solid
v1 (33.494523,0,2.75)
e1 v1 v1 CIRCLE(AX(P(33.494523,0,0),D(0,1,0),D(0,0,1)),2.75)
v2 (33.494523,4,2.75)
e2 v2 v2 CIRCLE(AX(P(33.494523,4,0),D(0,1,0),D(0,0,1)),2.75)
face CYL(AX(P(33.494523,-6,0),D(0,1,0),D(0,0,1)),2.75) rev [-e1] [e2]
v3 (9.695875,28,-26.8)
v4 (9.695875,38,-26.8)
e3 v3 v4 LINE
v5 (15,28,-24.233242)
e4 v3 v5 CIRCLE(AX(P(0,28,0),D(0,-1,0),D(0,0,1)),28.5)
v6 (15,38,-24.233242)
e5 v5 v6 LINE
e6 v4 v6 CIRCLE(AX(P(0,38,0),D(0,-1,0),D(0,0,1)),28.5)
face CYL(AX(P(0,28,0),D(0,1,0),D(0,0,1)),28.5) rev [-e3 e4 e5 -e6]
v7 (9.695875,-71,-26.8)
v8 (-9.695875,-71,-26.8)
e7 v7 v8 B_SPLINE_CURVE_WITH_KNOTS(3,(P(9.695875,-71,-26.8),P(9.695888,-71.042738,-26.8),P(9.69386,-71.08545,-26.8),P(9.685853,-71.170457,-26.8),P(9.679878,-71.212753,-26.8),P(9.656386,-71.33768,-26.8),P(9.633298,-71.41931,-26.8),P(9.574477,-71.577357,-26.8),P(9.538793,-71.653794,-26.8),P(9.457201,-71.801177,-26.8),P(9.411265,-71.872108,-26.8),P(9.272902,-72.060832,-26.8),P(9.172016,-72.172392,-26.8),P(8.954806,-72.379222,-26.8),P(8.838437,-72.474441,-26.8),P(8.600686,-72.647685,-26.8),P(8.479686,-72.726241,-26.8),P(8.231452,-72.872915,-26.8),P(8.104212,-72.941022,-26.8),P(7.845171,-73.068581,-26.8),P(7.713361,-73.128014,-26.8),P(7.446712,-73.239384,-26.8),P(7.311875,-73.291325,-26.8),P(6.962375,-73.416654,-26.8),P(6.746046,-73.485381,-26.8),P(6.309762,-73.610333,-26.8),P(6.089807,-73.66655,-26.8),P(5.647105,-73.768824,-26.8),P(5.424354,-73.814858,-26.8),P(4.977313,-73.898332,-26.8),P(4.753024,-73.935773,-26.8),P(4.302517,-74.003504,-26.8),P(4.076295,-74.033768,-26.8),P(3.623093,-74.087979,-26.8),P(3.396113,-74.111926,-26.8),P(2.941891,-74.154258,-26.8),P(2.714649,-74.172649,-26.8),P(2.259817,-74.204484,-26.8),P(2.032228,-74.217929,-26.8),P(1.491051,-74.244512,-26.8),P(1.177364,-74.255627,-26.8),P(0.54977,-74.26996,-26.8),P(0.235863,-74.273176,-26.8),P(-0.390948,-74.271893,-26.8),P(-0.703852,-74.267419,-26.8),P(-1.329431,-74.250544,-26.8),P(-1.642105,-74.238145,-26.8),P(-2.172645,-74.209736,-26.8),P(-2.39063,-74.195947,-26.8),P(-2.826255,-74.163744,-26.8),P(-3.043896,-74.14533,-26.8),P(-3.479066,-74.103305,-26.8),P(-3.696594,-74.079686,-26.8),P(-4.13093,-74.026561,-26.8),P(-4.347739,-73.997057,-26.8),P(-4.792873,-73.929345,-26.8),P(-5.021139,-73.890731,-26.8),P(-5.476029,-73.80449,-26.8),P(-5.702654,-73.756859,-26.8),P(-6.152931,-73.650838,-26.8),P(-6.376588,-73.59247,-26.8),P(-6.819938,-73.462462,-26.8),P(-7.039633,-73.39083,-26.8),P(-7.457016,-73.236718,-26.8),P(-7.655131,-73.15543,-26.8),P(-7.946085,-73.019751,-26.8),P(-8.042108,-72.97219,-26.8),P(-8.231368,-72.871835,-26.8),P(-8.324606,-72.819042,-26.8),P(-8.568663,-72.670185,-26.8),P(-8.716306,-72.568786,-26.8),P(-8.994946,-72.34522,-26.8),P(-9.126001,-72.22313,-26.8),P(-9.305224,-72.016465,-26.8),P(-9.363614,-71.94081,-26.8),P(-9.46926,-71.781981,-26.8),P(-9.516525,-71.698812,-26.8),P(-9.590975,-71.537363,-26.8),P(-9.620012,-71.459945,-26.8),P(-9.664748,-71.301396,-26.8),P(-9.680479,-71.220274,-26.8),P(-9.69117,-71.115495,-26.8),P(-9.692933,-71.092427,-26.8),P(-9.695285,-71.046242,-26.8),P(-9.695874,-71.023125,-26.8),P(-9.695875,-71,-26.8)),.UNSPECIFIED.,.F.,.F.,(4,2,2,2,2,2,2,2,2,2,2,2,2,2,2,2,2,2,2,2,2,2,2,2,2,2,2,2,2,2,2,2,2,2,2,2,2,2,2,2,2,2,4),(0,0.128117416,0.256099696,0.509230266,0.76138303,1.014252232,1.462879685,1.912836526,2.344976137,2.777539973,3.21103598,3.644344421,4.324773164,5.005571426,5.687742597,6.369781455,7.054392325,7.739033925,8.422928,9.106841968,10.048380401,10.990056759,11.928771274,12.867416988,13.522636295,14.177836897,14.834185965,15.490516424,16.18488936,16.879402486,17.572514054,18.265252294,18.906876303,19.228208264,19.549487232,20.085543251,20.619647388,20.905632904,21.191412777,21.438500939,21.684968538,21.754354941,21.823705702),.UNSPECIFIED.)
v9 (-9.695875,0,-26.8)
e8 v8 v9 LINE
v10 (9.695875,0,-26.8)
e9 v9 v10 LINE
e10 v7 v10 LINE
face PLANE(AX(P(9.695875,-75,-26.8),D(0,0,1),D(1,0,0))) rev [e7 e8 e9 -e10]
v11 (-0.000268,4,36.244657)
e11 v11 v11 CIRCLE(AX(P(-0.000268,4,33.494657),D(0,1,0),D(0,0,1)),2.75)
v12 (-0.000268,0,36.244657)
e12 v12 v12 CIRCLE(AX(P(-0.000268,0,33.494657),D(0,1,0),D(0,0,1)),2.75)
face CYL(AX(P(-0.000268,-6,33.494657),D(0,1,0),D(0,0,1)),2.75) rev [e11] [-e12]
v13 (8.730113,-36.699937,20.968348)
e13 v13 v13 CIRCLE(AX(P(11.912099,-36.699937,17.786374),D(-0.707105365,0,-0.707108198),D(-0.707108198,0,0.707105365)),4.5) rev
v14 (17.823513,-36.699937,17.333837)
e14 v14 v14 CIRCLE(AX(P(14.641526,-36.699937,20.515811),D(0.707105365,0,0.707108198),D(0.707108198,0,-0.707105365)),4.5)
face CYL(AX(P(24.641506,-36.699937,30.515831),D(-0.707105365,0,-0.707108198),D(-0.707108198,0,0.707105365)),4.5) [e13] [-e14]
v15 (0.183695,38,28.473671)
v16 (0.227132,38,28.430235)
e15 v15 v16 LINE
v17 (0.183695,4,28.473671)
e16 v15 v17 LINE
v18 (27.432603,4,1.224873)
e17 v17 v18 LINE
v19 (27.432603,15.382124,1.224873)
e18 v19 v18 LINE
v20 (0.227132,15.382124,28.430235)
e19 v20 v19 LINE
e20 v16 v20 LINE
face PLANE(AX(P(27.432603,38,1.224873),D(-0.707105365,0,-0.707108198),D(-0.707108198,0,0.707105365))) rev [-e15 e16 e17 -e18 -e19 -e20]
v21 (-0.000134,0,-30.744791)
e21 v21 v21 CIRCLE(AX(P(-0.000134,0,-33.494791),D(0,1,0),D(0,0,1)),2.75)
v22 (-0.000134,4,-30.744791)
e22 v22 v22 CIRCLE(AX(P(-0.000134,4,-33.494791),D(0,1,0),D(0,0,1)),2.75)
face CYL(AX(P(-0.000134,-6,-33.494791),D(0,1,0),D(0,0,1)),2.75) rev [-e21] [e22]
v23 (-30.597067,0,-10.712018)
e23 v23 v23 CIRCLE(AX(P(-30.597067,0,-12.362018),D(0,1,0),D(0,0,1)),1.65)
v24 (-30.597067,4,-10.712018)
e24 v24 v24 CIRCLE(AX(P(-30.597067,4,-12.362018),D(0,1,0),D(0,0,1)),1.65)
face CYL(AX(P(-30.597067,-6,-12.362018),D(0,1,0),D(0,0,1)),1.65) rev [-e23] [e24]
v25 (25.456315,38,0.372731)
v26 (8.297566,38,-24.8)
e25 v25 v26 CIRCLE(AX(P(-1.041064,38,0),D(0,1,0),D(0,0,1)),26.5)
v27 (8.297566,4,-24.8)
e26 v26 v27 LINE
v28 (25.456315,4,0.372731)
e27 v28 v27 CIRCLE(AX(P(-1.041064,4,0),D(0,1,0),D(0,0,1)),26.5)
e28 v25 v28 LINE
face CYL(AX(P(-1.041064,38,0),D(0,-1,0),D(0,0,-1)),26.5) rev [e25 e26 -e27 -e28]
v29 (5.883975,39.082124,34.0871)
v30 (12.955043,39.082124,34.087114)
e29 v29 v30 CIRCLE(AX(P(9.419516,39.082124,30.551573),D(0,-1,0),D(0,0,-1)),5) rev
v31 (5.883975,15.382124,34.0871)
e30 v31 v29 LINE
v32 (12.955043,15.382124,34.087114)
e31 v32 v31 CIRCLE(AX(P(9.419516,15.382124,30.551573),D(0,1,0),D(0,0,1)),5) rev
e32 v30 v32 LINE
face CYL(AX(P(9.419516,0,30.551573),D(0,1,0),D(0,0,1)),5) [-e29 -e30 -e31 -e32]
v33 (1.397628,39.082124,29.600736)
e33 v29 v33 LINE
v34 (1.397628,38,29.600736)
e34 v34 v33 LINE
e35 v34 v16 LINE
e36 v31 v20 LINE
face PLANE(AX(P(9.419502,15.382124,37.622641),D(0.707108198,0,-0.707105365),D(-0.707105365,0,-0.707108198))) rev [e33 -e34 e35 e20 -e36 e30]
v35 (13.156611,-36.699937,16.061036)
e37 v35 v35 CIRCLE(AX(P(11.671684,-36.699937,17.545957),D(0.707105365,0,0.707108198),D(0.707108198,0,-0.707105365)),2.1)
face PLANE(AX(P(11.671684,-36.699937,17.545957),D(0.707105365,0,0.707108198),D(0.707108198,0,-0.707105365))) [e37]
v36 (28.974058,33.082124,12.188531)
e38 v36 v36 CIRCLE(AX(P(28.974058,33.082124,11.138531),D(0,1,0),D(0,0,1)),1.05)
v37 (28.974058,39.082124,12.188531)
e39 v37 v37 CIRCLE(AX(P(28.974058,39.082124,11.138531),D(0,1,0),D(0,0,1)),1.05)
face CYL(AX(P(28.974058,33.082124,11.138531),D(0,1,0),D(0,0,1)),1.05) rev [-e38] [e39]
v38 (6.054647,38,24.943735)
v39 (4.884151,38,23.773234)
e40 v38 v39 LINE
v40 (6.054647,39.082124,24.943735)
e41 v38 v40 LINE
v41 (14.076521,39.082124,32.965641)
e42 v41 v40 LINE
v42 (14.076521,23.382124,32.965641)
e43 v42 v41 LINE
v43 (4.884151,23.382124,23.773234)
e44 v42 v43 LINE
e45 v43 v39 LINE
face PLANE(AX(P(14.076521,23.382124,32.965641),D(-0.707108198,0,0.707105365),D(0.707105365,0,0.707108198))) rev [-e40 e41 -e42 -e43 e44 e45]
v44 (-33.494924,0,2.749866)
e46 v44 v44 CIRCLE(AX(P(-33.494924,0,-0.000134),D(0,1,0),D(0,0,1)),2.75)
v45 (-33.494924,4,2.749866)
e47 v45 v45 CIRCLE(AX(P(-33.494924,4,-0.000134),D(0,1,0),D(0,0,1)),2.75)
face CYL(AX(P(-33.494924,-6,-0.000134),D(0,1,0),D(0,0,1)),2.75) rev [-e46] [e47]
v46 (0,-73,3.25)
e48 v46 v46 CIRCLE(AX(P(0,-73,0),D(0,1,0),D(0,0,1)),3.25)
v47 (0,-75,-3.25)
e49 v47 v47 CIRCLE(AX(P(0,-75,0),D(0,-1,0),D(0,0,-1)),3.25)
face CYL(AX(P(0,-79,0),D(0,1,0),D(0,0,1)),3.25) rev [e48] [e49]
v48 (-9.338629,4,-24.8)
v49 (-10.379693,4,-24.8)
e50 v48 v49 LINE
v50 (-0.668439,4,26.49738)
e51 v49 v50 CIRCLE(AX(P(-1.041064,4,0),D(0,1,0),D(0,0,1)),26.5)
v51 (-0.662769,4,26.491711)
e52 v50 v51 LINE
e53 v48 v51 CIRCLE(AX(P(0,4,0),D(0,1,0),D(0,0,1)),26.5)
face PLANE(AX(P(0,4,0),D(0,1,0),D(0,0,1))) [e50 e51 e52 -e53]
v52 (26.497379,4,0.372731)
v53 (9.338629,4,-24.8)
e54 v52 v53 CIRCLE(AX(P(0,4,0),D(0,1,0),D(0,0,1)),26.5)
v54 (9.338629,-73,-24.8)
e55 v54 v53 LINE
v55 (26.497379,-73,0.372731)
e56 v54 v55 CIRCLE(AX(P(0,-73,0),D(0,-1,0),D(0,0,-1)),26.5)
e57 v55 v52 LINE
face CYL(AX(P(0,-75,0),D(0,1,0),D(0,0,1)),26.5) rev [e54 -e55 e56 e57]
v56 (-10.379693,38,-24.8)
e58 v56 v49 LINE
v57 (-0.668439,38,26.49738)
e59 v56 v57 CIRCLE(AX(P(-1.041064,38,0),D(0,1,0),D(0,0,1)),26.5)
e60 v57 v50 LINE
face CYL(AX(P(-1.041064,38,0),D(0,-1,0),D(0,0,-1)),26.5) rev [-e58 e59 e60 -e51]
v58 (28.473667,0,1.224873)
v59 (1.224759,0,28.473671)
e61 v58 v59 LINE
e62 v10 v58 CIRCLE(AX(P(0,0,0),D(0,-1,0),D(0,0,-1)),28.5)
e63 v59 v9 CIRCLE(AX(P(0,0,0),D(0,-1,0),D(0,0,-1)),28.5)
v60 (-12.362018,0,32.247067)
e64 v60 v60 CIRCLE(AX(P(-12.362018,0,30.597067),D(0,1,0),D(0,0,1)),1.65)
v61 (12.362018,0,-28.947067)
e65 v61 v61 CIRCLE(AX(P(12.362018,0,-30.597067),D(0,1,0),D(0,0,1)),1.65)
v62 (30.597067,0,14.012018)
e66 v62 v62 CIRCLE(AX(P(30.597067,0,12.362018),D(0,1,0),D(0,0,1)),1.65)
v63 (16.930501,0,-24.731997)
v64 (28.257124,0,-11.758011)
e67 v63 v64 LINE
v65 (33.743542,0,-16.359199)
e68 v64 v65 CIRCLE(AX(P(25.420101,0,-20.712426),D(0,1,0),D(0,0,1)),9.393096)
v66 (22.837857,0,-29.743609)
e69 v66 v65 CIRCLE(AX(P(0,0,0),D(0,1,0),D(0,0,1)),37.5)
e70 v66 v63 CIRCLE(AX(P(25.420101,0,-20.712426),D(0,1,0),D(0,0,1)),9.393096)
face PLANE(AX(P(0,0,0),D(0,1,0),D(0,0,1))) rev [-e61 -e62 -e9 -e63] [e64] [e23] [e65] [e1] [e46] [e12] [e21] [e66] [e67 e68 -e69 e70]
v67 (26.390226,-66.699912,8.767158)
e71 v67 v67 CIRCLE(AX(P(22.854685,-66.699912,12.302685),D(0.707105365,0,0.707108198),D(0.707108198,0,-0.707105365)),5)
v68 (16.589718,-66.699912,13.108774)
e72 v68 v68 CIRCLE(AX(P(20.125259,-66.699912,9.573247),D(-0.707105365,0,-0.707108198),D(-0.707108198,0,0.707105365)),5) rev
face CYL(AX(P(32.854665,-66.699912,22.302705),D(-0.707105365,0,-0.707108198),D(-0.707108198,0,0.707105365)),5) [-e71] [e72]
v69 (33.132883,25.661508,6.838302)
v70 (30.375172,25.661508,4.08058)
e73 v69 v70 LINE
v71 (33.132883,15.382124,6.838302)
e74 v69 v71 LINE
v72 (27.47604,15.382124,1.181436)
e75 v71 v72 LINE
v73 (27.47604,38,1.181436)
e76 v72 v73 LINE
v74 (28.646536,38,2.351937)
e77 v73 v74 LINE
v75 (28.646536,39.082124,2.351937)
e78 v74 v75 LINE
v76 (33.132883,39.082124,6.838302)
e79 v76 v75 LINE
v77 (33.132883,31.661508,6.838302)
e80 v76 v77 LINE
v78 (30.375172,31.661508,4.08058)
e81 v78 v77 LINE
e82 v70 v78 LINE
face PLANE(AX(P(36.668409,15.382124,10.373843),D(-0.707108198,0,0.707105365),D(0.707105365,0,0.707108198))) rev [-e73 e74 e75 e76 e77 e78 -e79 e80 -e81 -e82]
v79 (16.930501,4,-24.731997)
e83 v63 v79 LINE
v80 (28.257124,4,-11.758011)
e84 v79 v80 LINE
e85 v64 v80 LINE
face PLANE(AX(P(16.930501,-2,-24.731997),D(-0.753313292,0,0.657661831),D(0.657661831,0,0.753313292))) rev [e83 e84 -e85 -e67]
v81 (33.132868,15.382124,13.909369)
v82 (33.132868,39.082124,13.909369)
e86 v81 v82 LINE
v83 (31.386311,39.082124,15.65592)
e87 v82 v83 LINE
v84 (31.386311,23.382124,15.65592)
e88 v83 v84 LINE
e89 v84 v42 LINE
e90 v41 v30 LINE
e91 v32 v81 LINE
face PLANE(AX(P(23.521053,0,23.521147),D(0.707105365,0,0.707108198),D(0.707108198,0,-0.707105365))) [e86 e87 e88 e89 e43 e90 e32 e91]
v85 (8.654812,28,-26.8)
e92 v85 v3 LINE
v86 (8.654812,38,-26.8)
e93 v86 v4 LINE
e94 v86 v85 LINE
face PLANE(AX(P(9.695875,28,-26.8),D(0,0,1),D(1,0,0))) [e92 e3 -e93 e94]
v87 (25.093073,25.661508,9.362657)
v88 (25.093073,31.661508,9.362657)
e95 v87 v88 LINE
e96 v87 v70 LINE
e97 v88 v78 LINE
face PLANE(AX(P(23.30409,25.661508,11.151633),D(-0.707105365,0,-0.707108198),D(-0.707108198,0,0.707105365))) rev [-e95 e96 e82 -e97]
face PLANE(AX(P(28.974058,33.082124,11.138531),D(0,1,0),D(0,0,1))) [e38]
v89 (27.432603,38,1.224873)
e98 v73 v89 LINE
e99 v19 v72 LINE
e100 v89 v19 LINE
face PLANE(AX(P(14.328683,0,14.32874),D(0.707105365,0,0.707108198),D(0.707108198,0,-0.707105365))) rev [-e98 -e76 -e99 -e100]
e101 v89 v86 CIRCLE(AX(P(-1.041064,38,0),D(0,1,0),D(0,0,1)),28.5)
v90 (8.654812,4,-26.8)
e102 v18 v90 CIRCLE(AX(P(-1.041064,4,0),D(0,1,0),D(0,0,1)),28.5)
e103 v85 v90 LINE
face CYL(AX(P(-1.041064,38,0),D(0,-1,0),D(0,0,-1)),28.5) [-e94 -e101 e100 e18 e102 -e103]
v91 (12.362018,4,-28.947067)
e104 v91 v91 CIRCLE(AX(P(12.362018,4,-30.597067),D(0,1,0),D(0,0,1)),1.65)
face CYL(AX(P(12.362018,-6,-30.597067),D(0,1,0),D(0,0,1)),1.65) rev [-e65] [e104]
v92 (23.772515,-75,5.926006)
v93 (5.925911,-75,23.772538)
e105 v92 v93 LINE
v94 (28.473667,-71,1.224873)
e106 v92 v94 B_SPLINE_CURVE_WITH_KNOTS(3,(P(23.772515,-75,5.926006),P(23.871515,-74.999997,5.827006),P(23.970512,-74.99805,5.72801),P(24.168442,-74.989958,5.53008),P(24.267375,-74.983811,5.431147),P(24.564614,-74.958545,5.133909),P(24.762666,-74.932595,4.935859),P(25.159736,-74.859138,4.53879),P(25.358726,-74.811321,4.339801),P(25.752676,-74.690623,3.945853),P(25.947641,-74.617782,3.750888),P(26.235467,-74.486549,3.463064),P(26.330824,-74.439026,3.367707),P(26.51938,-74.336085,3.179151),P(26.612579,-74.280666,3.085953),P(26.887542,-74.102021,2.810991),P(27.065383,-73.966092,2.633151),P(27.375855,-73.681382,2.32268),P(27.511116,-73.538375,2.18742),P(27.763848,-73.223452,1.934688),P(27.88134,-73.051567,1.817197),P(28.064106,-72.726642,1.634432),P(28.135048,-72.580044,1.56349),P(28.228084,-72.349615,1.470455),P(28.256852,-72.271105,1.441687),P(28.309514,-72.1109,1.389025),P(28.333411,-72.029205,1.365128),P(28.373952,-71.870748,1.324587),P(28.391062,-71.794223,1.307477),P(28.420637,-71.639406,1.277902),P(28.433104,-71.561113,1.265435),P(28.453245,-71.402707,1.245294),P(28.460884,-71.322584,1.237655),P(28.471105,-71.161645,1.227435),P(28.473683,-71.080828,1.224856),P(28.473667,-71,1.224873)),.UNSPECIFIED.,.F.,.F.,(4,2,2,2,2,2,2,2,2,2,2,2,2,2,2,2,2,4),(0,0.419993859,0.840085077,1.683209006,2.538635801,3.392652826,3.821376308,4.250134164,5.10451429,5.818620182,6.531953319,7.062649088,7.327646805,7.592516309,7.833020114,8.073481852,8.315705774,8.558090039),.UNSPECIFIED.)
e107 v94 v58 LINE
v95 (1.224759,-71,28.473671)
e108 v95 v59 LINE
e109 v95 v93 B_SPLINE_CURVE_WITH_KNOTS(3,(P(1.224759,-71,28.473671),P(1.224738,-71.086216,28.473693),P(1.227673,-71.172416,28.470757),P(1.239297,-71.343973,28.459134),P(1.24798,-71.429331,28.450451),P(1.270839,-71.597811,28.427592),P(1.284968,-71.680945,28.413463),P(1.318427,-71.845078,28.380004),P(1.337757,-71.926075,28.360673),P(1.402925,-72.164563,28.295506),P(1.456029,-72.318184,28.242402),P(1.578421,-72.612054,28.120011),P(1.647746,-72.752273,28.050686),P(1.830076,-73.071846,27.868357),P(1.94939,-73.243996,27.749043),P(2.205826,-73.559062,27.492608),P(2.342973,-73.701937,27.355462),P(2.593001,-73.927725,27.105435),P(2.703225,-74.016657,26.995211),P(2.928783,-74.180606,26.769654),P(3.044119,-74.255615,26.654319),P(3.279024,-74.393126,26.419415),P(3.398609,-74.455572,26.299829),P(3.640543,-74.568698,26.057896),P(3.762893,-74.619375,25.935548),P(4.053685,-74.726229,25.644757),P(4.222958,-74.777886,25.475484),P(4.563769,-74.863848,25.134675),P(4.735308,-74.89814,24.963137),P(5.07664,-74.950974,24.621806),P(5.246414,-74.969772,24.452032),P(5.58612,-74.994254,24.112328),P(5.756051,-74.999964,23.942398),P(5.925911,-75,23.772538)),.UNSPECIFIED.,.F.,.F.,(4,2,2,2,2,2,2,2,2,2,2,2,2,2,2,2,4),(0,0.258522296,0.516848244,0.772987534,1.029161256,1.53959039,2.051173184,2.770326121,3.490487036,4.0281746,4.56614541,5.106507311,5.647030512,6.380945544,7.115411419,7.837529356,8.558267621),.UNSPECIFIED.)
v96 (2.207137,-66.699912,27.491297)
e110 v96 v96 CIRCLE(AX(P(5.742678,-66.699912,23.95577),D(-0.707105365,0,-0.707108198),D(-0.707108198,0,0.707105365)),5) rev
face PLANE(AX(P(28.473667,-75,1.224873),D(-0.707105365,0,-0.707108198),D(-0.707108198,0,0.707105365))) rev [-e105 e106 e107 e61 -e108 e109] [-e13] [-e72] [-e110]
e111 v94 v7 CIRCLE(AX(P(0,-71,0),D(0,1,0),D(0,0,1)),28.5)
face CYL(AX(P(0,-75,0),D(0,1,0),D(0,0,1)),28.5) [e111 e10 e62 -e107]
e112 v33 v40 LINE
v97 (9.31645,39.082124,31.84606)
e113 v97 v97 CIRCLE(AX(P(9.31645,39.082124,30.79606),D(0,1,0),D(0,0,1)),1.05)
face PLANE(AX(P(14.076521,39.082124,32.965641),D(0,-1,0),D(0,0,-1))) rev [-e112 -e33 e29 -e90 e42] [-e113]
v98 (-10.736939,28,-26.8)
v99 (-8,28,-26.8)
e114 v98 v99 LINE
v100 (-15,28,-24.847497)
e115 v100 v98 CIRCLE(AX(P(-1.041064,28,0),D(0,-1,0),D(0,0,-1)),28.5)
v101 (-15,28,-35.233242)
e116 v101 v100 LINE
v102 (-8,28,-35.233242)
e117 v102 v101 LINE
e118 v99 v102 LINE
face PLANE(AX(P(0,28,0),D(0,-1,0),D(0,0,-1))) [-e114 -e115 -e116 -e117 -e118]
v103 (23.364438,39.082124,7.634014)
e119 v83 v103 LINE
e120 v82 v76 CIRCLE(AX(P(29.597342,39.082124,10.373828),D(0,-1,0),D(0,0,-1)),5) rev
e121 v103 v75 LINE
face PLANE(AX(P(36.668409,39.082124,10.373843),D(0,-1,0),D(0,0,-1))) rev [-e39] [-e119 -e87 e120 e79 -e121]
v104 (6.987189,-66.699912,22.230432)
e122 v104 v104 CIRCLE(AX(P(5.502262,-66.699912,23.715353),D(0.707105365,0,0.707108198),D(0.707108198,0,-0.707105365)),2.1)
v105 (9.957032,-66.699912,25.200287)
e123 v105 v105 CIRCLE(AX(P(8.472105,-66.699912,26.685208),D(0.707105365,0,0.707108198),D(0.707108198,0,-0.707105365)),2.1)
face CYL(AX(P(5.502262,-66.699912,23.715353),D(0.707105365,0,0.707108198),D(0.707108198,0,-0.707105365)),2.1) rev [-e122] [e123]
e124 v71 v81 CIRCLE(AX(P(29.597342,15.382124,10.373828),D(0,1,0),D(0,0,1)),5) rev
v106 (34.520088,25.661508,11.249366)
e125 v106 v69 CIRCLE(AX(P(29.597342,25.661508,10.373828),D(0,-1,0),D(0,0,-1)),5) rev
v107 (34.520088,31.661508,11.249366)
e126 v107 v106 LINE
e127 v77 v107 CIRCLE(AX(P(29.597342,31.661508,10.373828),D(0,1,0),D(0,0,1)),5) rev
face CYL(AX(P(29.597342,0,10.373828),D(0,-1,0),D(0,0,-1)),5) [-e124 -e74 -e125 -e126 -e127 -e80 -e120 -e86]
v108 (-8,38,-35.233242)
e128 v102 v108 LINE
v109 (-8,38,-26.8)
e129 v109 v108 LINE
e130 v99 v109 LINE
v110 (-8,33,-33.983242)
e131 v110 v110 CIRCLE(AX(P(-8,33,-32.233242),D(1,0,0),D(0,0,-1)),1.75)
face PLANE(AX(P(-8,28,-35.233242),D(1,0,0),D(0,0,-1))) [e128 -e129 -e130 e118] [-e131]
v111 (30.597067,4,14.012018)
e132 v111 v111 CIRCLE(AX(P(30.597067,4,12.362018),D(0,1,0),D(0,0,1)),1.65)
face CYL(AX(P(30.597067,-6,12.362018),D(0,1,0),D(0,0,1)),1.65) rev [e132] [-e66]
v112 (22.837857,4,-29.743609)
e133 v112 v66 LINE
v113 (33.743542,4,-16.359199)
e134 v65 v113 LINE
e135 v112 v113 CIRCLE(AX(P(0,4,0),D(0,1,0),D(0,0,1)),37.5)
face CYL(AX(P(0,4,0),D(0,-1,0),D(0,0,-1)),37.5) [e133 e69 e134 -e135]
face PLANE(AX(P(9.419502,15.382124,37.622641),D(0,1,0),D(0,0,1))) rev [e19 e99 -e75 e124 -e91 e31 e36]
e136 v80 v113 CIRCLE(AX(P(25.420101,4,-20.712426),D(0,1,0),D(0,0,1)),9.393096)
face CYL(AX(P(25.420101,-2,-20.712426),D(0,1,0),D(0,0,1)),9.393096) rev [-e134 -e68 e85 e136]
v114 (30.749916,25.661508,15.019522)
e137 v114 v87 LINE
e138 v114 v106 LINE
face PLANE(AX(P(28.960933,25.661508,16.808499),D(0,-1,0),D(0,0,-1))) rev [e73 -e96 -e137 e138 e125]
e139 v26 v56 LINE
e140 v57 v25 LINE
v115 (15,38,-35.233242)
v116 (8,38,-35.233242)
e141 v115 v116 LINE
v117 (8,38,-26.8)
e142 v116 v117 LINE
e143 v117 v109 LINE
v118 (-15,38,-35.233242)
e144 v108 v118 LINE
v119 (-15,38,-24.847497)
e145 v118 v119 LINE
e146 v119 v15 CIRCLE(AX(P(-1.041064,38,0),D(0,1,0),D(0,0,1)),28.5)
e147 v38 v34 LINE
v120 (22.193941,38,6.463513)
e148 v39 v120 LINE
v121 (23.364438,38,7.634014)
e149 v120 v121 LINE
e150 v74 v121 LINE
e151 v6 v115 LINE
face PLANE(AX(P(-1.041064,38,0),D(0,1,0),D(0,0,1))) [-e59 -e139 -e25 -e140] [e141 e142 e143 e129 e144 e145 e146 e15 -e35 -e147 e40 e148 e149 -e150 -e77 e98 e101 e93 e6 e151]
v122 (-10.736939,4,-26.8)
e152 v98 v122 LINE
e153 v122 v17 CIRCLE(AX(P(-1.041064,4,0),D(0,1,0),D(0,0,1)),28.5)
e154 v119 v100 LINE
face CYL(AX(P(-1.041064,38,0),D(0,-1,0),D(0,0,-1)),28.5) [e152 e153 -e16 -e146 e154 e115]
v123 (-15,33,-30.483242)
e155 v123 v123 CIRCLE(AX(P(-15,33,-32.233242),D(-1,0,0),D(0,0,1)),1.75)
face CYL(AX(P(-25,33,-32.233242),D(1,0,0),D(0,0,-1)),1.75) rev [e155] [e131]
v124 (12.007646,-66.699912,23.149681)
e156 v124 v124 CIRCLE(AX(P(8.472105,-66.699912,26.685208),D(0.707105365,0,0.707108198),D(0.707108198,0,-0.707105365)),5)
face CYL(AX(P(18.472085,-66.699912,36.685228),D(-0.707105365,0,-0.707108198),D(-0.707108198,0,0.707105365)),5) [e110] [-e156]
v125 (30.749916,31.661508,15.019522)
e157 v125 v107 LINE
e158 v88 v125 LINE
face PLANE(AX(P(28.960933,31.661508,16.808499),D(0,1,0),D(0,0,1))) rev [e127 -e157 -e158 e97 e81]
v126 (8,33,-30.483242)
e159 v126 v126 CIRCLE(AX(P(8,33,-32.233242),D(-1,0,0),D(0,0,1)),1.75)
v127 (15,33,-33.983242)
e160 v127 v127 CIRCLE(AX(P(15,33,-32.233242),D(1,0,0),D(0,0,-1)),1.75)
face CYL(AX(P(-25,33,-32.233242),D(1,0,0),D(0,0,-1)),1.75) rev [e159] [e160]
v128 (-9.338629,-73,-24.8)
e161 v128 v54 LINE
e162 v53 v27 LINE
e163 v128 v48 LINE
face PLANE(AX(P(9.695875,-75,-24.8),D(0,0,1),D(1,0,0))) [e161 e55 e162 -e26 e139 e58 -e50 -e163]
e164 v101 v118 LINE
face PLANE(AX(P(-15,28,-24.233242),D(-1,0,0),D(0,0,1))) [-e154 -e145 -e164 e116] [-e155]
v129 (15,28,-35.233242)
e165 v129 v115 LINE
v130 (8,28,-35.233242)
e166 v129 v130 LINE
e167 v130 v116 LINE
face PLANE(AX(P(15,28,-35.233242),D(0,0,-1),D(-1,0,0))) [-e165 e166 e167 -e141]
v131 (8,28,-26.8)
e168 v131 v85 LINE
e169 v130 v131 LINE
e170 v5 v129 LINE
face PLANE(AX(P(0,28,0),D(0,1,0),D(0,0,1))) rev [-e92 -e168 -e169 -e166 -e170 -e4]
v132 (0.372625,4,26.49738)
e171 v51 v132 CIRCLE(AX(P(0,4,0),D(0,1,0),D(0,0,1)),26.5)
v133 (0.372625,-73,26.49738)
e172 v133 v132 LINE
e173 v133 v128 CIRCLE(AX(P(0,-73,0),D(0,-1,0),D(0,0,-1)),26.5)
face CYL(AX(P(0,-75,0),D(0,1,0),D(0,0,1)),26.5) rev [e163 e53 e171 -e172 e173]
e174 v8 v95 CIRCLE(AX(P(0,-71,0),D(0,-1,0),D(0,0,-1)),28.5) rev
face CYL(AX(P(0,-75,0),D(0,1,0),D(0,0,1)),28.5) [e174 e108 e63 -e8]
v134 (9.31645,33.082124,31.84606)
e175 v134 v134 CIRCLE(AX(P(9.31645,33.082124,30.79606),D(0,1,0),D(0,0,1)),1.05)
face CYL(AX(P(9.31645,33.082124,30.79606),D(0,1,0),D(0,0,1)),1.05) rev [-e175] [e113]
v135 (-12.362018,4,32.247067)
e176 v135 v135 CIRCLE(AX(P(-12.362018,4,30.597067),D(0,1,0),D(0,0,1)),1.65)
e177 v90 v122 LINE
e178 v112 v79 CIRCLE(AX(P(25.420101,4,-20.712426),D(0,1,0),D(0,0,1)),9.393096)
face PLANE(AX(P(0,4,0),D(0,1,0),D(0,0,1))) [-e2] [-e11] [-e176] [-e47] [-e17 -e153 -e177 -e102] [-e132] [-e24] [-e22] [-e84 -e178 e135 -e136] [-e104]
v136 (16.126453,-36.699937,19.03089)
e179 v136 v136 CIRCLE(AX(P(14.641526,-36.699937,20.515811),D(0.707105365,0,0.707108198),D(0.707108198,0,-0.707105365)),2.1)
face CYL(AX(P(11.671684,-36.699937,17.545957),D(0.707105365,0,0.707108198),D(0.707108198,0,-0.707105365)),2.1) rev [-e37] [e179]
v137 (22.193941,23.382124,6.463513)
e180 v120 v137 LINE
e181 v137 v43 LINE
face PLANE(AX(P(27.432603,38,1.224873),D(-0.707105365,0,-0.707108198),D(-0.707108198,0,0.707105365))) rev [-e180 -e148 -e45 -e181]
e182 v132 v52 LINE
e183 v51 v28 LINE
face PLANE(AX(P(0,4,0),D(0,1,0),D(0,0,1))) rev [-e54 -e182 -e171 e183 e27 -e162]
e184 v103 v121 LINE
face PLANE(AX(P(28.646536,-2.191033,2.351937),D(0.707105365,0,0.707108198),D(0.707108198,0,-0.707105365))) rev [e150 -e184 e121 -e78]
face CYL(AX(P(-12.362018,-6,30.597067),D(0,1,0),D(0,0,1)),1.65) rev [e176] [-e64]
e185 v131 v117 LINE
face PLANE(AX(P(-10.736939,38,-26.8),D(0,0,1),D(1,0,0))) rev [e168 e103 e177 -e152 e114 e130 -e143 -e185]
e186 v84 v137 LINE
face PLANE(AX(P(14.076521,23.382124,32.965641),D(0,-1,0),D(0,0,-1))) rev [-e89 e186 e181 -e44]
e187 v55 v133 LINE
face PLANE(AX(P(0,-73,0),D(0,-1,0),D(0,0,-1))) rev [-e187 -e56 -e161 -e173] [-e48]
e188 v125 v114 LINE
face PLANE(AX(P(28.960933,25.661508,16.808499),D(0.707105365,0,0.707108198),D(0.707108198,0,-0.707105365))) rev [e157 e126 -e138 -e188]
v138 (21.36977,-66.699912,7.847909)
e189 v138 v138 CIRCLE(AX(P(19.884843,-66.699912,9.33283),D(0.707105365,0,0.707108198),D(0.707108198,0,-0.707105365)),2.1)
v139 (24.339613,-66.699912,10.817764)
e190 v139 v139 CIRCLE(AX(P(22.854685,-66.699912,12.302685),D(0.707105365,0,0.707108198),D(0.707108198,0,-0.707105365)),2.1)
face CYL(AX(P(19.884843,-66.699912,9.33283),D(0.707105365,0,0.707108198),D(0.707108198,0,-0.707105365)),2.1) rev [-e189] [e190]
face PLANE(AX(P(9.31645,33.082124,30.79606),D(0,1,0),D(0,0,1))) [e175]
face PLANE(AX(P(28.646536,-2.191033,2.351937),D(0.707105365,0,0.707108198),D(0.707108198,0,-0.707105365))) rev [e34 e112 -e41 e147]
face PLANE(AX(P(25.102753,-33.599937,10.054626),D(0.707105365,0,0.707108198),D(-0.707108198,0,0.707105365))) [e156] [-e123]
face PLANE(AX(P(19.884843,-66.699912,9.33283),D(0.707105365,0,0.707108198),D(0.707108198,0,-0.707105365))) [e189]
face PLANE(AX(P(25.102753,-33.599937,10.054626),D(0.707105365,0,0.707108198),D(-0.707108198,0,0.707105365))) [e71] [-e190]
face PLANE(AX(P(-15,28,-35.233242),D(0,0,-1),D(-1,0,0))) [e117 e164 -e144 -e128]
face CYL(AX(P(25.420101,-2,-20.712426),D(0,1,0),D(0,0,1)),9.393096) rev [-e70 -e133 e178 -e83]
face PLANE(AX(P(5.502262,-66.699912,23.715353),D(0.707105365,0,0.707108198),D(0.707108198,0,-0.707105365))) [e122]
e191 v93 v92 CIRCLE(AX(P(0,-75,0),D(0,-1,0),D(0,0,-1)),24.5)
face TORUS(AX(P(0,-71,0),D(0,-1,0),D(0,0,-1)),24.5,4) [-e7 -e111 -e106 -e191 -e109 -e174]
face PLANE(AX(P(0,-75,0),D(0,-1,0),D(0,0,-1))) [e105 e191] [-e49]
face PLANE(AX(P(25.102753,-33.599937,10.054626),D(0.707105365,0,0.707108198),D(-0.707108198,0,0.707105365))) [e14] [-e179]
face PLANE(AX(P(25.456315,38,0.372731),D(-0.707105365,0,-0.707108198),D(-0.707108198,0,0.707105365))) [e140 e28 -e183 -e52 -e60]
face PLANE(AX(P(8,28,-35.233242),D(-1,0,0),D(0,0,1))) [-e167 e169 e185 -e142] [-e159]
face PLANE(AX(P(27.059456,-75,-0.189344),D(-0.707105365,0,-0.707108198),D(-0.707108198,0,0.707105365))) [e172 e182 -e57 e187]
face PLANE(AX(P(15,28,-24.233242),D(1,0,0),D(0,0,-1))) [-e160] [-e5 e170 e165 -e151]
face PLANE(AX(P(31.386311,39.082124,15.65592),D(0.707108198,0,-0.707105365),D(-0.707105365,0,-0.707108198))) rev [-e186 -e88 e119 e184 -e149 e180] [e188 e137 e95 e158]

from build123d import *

# Parameters (mm, degrees)
SKETCH1_R            = 37.500000000000014
BOSS_EXTRUDE1_DEPTH  = 4
BOSS_EXTRUDE2_DEPTH  = 34
SKETCH5_R            = 2.7499999996325837
SKETCH5_R_2          = 2.75
SKETCH5_R_3          = 2.7500000000258247
SKETCH5_R_4          = 2.749999999658416
SKETCH5_R_5          = 1.6500000000000001
SKETCH5_R_6          = 1.6499999999999988
SKETCH5_R_7          = 1.6499999999999957
CUT_EXTRUDE2_DEPTH   = 10
BOSS_EXTRUDE6_DEPTH  = 75
SHELL1_T             = -2
CUT_EXTRUDE3_DEPTH   = 10
FILLET1_R            = 4
BOSS_EXTRUDE9_DEPTH  = 10
SKETCH21_R           = 1.7500000000000104
CUT_EXTRUDE5_DEPTH   = 40
BOSS_EXTRUDE13_DEPTH = 12.999999999999998
FILLET2_R            = 5
SKETCH28_R           = 1.05
SKETCH28_R_2         = 1.049999999999999
CUT_EXTRUDE11_DEPTH  = 5.999999999999993
SKETCH29_R           = 3.25
CUT_EXTRUDE12_DEPTH  = 5.999999999999993
SKETCH31_W           = 8
SKETCH31_H           = 5.999999999999993
CUT_EXTRUDE13_DEPTH  = 10
BOSS_EXTRUDE14_START = -28
BOSS_EXTRUDE14_DEPTH = 10
SKETCH33_R           = 4.9999999999920695
SKETCH33_R_2         = 4.499999999992068
BOSS_EXTRUDE15_DEPTH = 3.86
SKETCH34_R           = 2.0999999999920713
SKETCH34_R_2         = 2.099999999992072
SKETCH34_R_3         = 2.0999999999920704
CUT_EXTRUDE14_DEPTH  = 4.2
CUT_EXTRUDE15_DEPTH  = 6
CUT_EXTRUDE16_DEPTH  = 1.082123817


with BuildPart() as part:
    # Sketch1 → Boss-Extrude1 (new body)
    with BuildSketch(Plane(origin=(0, 0, 0), x_dir=(1, 0, 0), z_dir=(0, 1, 0))):
        with Locations(Location((0, 0, 0), (0, 0, 270))):
            Circle(SKETCH1_R)
    extrude(amount=BOSS_EXTRUDE1_DEPTH)

    # Sketch3 → Boss-Extrude2 (add)
    with BuildSketch(Plane(origin=(0, 4, 0), x_dir=(1, 0, 0), z_dir=(0, 1, 0))):
        with BuildLine():
            Line((27.43260268125508, -1.224872854444847), (0.18369490524426094, -28.473671452031667))
            ThreePointArc((0.18369490524426094, -28.473671452031667), (-29.000581799821436, -5.524070669091407), (-10.736939275039097, 26.800000000011135))
            Line((-10.736939275039097, 26.800000000011135), (8.654811548442561, 26.800000000011135))
            ThreePointArc((8.654811548442561, 26.800000000011135), (22.63544047994107, 15.864209469271458), (27.43260268125508, -1.224872854444847))
        make_face()
        with BuildLine():
            Line((25.45631471019754, -0.37273144868234936), (-0.6684385820861921, -26.49738006670114))
            ThreePointArc((-0.6684385820861921, -26.49738006670114), (-27.07858694278502, -4.929238469082694), (-10.379693313062322, 24.80000000001113))
            Line((-10.379693313062322, 24.80000000001113), (8.297565586465787, 24.80000000001113))
            ThreePointArc((8.297565586465787, 24.80000000001113), (20.85577312079139, 14.925767320058823), (25.45631471019754, -0.37273144868234936))
        make_face(mode=Mode.SUBTRACT)
    extrude(amount=BOSS_EXTRUDE2_DEPTH)

    # Sketch5 → Cut-Extrude2 (cut)
    with BuildSketch(Plane(origin=(0, 4, 0), x_dir=(1, 0, 0), z_dir=(0, 1, 0))):
        with Locations(Location((-33.49492446290215, 0.00013411391513071, 0), (0, 0, 270))):
            Circle(SKETCH5_R)
        with Locations(Location((-0.00013356723643175, 33.494790805725295, 0), (0, 0, 270))):
            Circle(SKETCH5_R_2)
        with Locations(Location((33.494523124573746, -8.994042047e-08, 0), (0, 0, 270))):
            Circle(SKETCH5_R_3)
        with Locations(Location((-0.00026777109197641, -33.49465678175059, 0), (0, 0, 270))):
            Circle(SKETCH5_R_4)
        with Locations(Location((-12.362017582725011, -30.59706720070402, 0), (0, 0, 270))):
            Circle(SKETCH5_R_5)
        with Locations(Location((-30.59706720070398, 12.362017582725123, 0), (0, 0, 270))):
            Circle(SKETCH5_R_6)
        with Locations(Location((12.362017582725228, 30.59706720070393, 0), (0, 0, 270))):
            Circle(SKETCH5_R_5)
        with Locations(Location((30.597067200703897, -12.362017582725326, 0), (0, 0, 270))):
            Circle(SKETCH5_R_7)
    extrude(amount=-CUT_EXTRUDE2_DEPTH, mode=Mode.SUBTRACT)

    # Sketch16 → Cut-Extrude3 (cut)
    with BuildSketch(Plane(origin=(0, 4, 0), x_dir=(1, 0, 0), z_dir=(0, 1, 0))):
        with BuildLine():
            Line((0.3726252811901698, -26.49738006670113), (26.4973785734739, -0.3727314486823372))
            ThreePointArc((26.4973785734739, -0.3727314486823372), (-18.738292161801, 18.738367240979606), (0.3726252811901698, -26.49738006670113))
        make_face()
    extrude(amount=-CUT_EXTRUDE3_DEPTH, mode=Mode.SUBTRACT)

    # Sketch18 → Boss-Extrude9 (add)
    with BuildSketch(Plane(origin=(0, 38.00000000000001, 0), x_dir=(1, 0, 0), z_dir=(0, 1, 0))):
        with BuildLine():
            Line((15, 24.233241632102853), (14.999999999999998, 35.23324163210285))
            Line((14.999999999999998, 35.23324163210285), (7.9999999999999964, 35.23324163210285))
            Line((7.9999999999999964, 35.23324163210285), (7.999999999999998, 26.80000000001115))
            Line((7.999999999999998, 26.80000000001115), (9.695875411718896, 26.80000000001115))
            ThreePointArc((9.695875411718896, 26.80000000001115), (12.414452372843087, 25.654071261350285), (15, 24.233241632102853))
        make_face()
        with BuildLine():
            Line((-7.9999999999999964, 35.23324163210285), (-7.999999999999998, 26.800000000011156))
            Line((-7.999999999999998, 26.800000000011156), (-9.695875411762707, 26.800000000011156))
            ThreePointArc((-9.695875411762707, 26.800000000011156), (-12.414452372860087, 25.65407126133764), (-15, 24.233241632102853))
            Line((-15, 24.233241632102853), (-14.999999999999998, 35.23324163210285))
            Line((-14.999999999999998, 35.23324163210285), (-7.9999999999999964, 35.23324163210285))
        make_face()
    extrude(amount=-BOSS_EXTRUDE9_DEPTH)

    # Sketch21 → Cut-Extrude5 (cut)
    with BuildSketch(Plane(origin=(15.000000000000004, 0, -2.37e-15), x_dir=(1.6e-16, 0, -1), z_dir=(1, 0, 1.6e-16))):
        with Locations((32.233241632105404, 33.000000000000185)):
            Circle(SKETCH21_R)
    extrude(amount=-CUT_EXTRUDE5_DEPTH, mode=Mode.SUBTRACT)

    # Sketch27 → Boss-Extrude13 (add)
    with BuildSketch(Plane(origin=(14.328682810517009, 0, 14.328740221598881), x_dir=(0.7071081977732587, 0, -0.7071053645969985), z_dir=(0.7071053645969985, 0, 0.7071081977732587))):
        Polygon((-13.356558336469002, 23.382123816577263), (-13.356558336469002, 39.082123816577024), (-19.94256467636435, 39.082123816577024), (-19.94256467636435, 15.382123816577272), (18.593133059597207, 15.382123816577272), (18.5931330595972, 39.082123816577024), (11.123133059597205, 39.082123816577024), (11.123133059597208, 23.382123816577263), align=None)
    extrude(amount=BOSS_EXTRUDE13_DEPTH)

    # Fillet2
    fillet2_edges = [part.edges().sort_by_distance(p)[0] for p in [
        (36.66840935900816, 27.23212381657715, 10.373842661544257),
        (9.419501582997341, 27.232123816577147, 37.62264125913108),
    ]]
    fillet(fillet2_edges, radius=FILLET2_R)

    # Sketch28 → Cut-Extrude11 (cut)
    with BuildSketch(Plane(origin=(0, 39.082123816577024, 0), x_dir=(1, 0, 0), z_dir=(0, 1, 0))):
        with Locations(Location((9.316450186911645, -30.79605966921365, 0), (0, 0, 270))):
            Circle(SKETCH28_R)
        with Locations(Location((28.97405808500825, -11.138530533417102, 0), (0, 0, 270))):
            Circle(SKETCH28_R_2)
    extrude(amount=-CUT_EXTRUDE11_DEPTH, mode=Mode.SUBTRACT)

    # Sketch31 → Cut-Extrude13 (cut)
    with BuildSketch(Plane(origin=(13.14735680873018, 4.81e-15, -13.147304131106994), x_dir=(-0.7071053645969986, 0, -0.7071081977732586), z_dir=(0.7071081977732586, 0, -0.7071053645969986))):
        with Locations((-28.36385815738135, 28.661507762433622)):
            Rectangle(SKETCH31_W, SKETCH31_H)
    extrude(amount=-CUT_EXTRUDE13_DEPTH, mode=Mode.SUBTRACT)



with BuildPart() as body_2:
    # Sketch15 → Boss-Extrude6 (new body)
    with BuildSketch(Plane.XZ):
        with BuildLine():
            Line((28.473666544542198, 1.2248728544340861), (1.2247587685206183, 28.47367145203166))
            ThreePointArc((1.2247587685206183, 28.47367145203166), (-27.95951793651176, 5.524070669097932), (-9.695875411762707, -26.800000000011156))
            Line((-9.695875411762707, -26.800000000011156), (9.695875411718896, -26.80000000001115))
            ThreePointArc((9.695875411718896, -26.80000000001115), (23.676504343229105, -15.864209469281034), (28.473666544542198, 1.2248728544340861))
        make_face()
    extrude(amount=BOSS_EXTRUDE6_DEPTH)

    # Shell1
    shell1_openings = [body_2.faces().sort_by_distance(p)[0] for p in [
        (-1.446451, 0, -1.185792841),
    ]]
    offset(amount=SHELL1_T, openings=shell1_openings, kind=Kind.INTERSECTION)

    # Fillet1
    fillet1_edges = [body_2.edges().sort_by_distance(p)[0] for p in [
        (-27.95951793651426, -75, 5.524070669085284),
    ]]
    fillet(fillet1_edges, radius=FILLET1_R - 0.0001)  # a hair under: the kernel refuses the full size

    # Sketch29 → Cut-Extrude12 (cut)
    with BuildSketch(Plane(origin=(0, -73, 0), x_dir=(1, 0, 0), z_dir=(0, 1, 0))):
        with Locations(Location((0, 0, 0), (0, 0, 270))):
            Circle(SKETCH29_R)
    extrude(amount=-CUT_EXTRUDE12_DEPTH, mode=Mode.SUBTRACT)


with BuildPart() as part_1:
    add(part.part)

    add(body_2.part)  # Boss-Extrude14 merges body 2
    # Sketch32 → Boss-Extrude14 (add)
    with BuildSketch(Plane(origin=(0, 38.00000000000001, 0), x_dir=(1, 0, 0), z_dir=(0, 1, 0)).offset(BOSS_EXTRUDE14_START)):
        with BuildLine():
            Line((-9.338629449742895, 24.800000000011153), (9.338629449721768, 24.800000000011146))
            ThreePointArc((9.338629449721768, 24.800000000011146), (-9.8838e-12, 26.499999999995538), (-9.338629449742895, 24.800000000011153))
        make_face()
    extrude(amount=-BOSS_EXTRUDE14_DEPTH)

    # Sketch33 → Boss-Extrude15 (add)
    with BuildSketch(Plane(origin=(14.849212656531403, 0, 14.849272153232874), x_dir=(0.7071081977732585, 0, -0.7071053645969986), z_dir=(0.7071053645969986, 0, 0.7071081977732585))):
        with Locations(Location((-12.878558963055134, -66.6999115263342, 0), (0, 0, 180))):
            Circle(SKETCH33_R)
        with Locations(Location((7.461441036944884, -66.6999115263342, 0), (0, 0, 180))):
            Circle(SKETCH33_R)
        with Locations(Location((-4.153697003459532, -36.6999367707353, 0), (0, 0, 180))):
            Circle(SKETCH33_R_2)
    extrude(amount=BOSS_EXTRUDE15_DEPTH)

    # Sketch34 → Cut-Extrude14 (cut)
    with BuildSketch(Plane(origin=(17.578639363876515, -2.8e-15, 17.578709796638343), x_dir=(0.7071081977732586, 0, -0.7071053645969986), z_dir=(0.7071053645969986, 0, 0.7071081977732586))):
        with Locations((-4.153697003459547, -36.69993677073529)):
            Circle(SKETCH34_R)
        with Locations((7.46144103694487, -66.6999115263342)):
            Circle(SKETCH34_R_2)
        with Locations((-12.87855896305515, -66.69991152633419)):
            Circle(SKETCH34_R_3)
    extrude(amount=-CUT_EXTRUDE14_DEPTH, mode=Mode.SUBTRACT)

    # Sketch35 → Cut-Extrude15 (cut)
    with BuildSketch(Plane(origin=(0, 4, 0), x_dir=(1, 0, 0), z_dir=(0, 1, 0))):
        with BuildLine():
            Line((16.930501479421057, 24.731996700817078), (28.25712370299877, 11.758011181218741))
            ThreePointArc((28.25712370299877, 11.758011181218741), (32.49604489503215, 26.889906797281803), (16.930501479421057, 24.731996700817078))
        make_face()
    extrude(amount=-CUT_EXTRUDE15_DEPTH, mode=Mode.SUBTRACT)

    # Sketch36 → Cut-Extrude16 (cut)
    with BuildSketch(Plane(origin=(0, 39.082123816577024, 0), x_dir=(1, 0, 0), z_dir=(0, 1, 0))):
        Polygon((27.47603961924718, -1.181436090491898), (28.646536061254768, -2.3519372223451054), (1.397628285210752, -29.600735819898734), (0.22713184323636287, -28.430234688078716), align=None)
    extrude(amount=-CUT_EXTRUDE16_DEPTH, mode=Mode.SUBTRACT)


solid = part_1.part
